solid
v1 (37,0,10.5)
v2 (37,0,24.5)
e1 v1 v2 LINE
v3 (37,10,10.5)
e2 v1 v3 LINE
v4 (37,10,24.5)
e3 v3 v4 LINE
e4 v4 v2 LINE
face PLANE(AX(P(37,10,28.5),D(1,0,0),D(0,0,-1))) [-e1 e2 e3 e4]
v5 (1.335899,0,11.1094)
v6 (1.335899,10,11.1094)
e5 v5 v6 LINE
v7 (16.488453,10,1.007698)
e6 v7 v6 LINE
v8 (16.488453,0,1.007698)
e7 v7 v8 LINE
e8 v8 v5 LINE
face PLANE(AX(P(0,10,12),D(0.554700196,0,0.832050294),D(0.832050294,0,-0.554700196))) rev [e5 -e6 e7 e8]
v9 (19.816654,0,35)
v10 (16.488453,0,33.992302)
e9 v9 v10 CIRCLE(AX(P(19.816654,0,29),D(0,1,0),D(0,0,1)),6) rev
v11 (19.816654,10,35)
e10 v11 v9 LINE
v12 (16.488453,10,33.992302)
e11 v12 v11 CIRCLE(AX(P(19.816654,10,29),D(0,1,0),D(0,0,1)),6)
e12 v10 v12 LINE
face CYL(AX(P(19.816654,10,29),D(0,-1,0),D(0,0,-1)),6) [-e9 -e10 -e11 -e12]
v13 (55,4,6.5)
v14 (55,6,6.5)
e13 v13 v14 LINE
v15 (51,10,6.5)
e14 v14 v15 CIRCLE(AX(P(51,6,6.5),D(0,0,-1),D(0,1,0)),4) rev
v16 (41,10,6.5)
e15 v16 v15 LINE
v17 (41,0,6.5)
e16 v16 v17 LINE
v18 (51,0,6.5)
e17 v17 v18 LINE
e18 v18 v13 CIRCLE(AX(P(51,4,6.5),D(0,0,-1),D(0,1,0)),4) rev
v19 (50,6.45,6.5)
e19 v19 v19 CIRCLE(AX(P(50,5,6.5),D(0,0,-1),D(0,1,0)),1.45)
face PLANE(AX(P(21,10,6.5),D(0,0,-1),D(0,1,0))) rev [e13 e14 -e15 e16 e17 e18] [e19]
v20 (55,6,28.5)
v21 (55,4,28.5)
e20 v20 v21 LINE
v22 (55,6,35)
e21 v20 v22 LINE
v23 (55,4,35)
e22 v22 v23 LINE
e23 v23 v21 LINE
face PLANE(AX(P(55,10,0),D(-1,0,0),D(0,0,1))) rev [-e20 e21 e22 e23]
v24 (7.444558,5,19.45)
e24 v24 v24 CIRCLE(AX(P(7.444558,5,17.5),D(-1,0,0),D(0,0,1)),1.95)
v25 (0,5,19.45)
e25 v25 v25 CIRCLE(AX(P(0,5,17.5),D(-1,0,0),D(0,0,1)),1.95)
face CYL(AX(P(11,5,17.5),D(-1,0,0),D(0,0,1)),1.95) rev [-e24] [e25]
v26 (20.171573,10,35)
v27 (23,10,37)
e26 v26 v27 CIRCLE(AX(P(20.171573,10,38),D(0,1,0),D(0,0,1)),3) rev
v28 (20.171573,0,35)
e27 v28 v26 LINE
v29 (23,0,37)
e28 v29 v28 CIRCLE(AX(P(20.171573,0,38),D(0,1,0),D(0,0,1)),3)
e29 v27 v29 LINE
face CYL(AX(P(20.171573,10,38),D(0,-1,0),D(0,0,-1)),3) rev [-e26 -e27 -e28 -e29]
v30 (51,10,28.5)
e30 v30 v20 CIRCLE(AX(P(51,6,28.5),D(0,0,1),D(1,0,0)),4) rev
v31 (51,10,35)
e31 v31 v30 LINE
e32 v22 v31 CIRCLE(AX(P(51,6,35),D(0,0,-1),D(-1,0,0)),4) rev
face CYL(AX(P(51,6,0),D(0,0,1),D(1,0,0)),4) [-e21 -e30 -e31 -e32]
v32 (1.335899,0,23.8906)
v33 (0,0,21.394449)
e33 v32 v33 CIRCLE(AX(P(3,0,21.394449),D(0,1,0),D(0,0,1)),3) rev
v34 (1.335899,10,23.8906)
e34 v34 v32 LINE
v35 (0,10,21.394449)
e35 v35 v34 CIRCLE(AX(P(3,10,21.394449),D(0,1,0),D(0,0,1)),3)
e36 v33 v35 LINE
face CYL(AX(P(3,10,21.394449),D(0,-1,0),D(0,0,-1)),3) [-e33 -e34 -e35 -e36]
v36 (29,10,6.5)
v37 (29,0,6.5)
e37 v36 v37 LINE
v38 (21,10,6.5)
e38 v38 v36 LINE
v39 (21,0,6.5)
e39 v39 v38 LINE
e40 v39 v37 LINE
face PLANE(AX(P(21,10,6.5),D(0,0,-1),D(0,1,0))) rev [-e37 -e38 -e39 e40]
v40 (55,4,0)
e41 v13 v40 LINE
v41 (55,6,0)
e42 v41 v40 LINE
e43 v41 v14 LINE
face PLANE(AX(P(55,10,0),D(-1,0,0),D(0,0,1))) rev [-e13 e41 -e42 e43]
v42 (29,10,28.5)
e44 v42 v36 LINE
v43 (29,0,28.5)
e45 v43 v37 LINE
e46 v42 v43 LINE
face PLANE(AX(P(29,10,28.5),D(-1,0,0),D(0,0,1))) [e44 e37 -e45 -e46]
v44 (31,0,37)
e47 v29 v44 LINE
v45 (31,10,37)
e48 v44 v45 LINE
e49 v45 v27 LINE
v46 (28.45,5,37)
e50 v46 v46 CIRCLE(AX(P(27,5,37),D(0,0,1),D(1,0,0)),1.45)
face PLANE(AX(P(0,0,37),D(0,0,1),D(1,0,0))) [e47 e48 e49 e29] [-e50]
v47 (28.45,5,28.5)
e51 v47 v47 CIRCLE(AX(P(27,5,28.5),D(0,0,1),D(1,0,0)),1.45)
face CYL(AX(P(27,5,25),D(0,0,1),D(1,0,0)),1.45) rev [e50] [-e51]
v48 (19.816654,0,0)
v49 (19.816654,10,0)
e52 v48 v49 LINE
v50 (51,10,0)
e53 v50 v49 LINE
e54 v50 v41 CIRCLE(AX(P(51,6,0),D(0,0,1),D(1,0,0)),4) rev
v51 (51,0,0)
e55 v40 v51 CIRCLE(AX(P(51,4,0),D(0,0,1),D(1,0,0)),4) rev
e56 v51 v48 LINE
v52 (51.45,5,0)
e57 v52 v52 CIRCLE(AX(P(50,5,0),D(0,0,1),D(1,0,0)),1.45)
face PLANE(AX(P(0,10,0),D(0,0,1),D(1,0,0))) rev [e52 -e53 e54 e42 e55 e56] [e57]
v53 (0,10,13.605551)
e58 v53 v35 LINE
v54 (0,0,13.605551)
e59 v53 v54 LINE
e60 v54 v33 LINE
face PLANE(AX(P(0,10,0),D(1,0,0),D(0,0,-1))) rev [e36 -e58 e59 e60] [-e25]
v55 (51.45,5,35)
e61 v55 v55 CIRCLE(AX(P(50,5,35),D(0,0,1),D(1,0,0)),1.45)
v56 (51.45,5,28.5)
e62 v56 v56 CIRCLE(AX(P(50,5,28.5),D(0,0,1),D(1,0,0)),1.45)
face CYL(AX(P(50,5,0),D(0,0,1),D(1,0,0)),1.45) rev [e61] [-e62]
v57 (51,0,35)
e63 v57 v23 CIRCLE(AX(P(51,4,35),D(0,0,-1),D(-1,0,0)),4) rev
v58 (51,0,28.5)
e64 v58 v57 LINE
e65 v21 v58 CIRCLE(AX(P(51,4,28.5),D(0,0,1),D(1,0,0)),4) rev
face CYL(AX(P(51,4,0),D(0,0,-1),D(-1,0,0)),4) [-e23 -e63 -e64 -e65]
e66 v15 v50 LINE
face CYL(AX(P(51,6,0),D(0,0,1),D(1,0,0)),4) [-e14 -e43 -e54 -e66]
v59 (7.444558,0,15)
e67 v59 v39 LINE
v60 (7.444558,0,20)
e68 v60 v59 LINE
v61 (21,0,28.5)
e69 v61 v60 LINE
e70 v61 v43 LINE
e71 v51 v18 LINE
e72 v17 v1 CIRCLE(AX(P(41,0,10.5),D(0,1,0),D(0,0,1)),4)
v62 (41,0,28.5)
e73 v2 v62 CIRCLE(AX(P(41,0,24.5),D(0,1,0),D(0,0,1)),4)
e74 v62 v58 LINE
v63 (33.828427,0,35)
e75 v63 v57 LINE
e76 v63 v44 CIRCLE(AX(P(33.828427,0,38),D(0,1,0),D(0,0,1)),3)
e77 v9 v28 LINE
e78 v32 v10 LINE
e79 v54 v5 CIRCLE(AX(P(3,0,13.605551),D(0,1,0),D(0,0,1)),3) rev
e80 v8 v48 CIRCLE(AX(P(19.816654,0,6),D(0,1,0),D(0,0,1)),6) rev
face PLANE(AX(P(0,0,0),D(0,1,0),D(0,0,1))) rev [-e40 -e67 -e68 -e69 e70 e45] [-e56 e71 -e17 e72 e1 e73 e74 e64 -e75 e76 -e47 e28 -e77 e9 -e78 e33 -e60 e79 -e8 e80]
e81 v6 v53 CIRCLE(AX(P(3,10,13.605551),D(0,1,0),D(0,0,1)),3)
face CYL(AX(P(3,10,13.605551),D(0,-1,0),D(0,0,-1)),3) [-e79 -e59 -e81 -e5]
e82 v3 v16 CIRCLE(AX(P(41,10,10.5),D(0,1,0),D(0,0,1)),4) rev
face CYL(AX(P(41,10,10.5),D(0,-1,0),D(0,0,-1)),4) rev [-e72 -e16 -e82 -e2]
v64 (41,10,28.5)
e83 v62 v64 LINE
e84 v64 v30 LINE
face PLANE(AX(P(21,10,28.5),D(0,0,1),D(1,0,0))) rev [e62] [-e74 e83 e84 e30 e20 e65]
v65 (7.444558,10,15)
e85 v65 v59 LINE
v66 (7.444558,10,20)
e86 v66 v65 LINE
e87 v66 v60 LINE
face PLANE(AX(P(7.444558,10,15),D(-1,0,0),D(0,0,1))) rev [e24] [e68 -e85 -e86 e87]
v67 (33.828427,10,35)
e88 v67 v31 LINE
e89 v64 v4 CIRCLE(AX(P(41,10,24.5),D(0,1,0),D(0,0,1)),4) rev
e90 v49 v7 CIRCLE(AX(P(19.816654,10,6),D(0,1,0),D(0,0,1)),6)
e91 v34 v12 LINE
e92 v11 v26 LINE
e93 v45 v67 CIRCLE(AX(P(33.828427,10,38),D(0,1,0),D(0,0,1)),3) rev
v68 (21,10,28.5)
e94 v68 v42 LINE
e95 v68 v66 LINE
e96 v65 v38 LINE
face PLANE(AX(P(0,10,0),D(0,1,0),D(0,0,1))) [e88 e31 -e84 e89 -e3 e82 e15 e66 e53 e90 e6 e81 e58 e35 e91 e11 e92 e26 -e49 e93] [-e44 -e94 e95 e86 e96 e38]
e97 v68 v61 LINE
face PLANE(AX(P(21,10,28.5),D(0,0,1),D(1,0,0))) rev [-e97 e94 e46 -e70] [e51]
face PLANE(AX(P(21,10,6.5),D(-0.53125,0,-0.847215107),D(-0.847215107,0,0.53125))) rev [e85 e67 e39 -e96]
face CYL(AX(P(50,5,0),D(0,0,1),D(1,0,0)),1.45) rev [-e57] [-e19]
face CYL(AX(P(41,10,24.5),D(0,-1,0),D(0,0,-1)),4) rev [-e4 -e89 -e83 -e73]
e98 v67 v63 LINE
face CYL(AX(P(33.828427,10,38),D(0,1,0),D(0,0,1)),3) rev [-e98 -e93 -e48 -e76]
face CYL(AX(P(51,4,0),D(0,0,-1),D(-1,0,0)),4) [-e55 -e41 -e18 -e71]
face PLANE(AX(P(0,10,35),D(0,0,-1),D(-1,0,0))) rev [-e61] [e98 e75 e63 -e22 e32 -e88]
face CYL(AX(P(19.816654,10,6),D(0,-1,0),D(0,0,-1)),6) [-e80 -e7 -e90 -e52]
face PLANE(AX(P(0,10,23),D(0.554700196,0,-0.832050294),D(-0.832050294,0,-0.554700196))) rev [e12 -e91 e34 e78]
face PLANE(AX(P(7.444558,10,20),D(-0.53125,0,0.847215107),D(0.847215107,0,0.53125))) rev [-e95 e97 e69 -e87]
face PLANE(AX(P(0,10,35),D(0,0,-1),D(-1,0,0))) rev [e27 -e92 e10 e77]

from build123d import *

# Parameters (mm, degrees)
SKETCH1_W           = 55
SKETCH1_H           = 35
BOSS_EXTRUDE1_DEPTH = 10
SKETCH2_W           = 22
SKETCH2_H           = 10
CUT_EXTRUDE1_DEPTH  = 34
CUT_EXTRUDE6_DEPTH  = 66.954529791
CUT_EXTRUDE7_DEPTH  = 66.954529791
SKETCH11_W          = 8
SKETCH11_H          = 22
BOSS_EXTRUDE3_DEPTH = 10
SKETCH12_R          = 1.45
CUT_EXTRUDE8_DEPTH  = 66.954529791
SKETCH13_R          = 1.95
CUT_EXTRUDE9_DEPTH  = 11
FILLET4_R           = 4
FILLET5_R           = 3
FILLET6_R           = 6
FILLET7_R           = 4
SKETCH14_W          = 8
SKETCH14_H          = 10
BOSS_EXTRUDE4_DEPTH = 2
SKETCH15_R          = 1.45
CUT_EXTRUDE10_DEPTH = 12
FILLET8_R           = 3


with BuildPart() as part:
    # Sketch1 → Boss-Extrude1 (new body)
    with BuildSketch(Plane(origin=(0, 0, 0), x_dir=(1, 0, 0), z_dir=(0, 1, 0))):
        with Locations((27.5, -17.5)):
            Rectangle(SKETCH1_W, SKETCH1_H)
    extrude(amount=BOSS_EXTRUDE1_DEPTH)

    # Sketch2 → Cut-Extrude1 (cut)
    with BuildSketch(Plane(origin=(55, 0, 0), x_dir=(0, 0, -1), z_dir=(1, 0, 0))):
        with Locations((-17.5, 5)):
            Rectangle(SKETCH2_W, SKETCH2_H)
    extrude(amount=-CUT_EXTRUDE1_DEPTH, mode=Mode.SUBTRACT)

    # Sketch9 → Cut-Extrude6 (cut, through all)
    with BuildSketch(Plane(origin=(0, 0, 0), x_dir=(-1, 0, 0), z_dir=(0, -1, 0))):
        Polygon((0, -12), (-18, 0), (0, 0), align=None)
        Polygon((0, -23), (-18, -35), (0, -35), align=None)
    extrude(amount=-CUT_EXTRUDE6_DEPTH, mode=Mode.SUBTRACT)

    # Sketch10 → Cut-Extrude7 (cut, through all)
    with BuildSketch(Plane(origin=(0, 0, 0), x_dir=(-1, 0, 0), z_dir=(0, -1, 0))):
        Polygon((-21, -6.5), (-7.444558288, -15), (-7.444558288, -20), (-21, -28.5), align=None)
    extrude(amount=-CUT_EXTRUDE7_DEPTH, mode=Mode.SUBTRACT)

    # Sketch11 → Boss-Extrude3 (add)
    with BuildSketch(Plane(origin=(0, 0, 0), x_dir=(-1, 0, 0), z_dir=(0, -1, 0))):
        with Locations((-33, -17.5)):
            Rectangle(SKETCH11_W, SKETCH11_H)
    extrude(amount=-BOSS_EXTRUDE3_DEPTH)

    # Sketch12 → Cut-Extrude8 (cut, through all)
    with BuildSketch(Plane.XY.offset(35)):
        with Locations((50, 5)):
            Circle(SKETCH12_R)
    extrude(amount=-CUT_EXTRUDE8_DEPTH, mode=Mode.SUBTRACT)

    # Sketch13 → Cut-Extrude9 (cut)
    with BuildSketch(Plane.ZY):
        with Locations((17.5, 5)):
            Circle(SKETCH13_R)
    extrude(amount=-CUT_EXTRUDE9_DEPTH, mode=Mode.SUBTRACT)

    # Fillet4
    fillet4_edges = [part.edges().sort_by_distance(p)[0] for p in [
        (55, 10, 31.75),
        (55, 0, 3.25),
        (55, 10, 3.25),
        (55, 0, 31.75),
    ]]
    fillet(fillet4_edges, radius=FILLET4_R)

    # Fillet5
    fillet5_edges = [part.edges().sort_by_distance(p)[0] for p in [
        (0, 5, 12),
        (0, 5, 23),
    ]]
    fillet(fillet5_edges, radius=FILLET5_R)

    # Fillet6
    fillet6_edges = [part.edges().sort_by_distance(p)[0] for p in [
        (18, 5, 0),
        (18, 5, 35),
    ]]
    fillet(fillet6_edges, radius=FILLET6_R)

    # Fillet7
    fillet7_edges = [part.edges().sort_by_distance(p)[0] for p in [
        (37, 5, 28.5),
        (37, 5, 6.5),
    ]]
    fillet(fillet7_edges, radius=FILLET7_R)

    # Sketch14 → Boss-Extrude4 (add)
    with BuildSketch(Plane.XY.offset(35)):
        with Locations((27, 5)):
            Rectangle(SKETCH14_W, SKETCH14_H)
    extrude(amount=BOSS_EXTRUDE4_DEPTH)

    # Sketch15 → Cut-Extrude10 (cut)
    with BuildSketch(Plane.XY.offset(37)):
        with Locations((27, 5)):
            Circle(SKETCH15_R)
    extrude(amount=-CUT_EXTRUDE10_DEPTH, mode=Mode.SUBTRACT)

    # Fillet8
    # the kernel refuses this fillet: 3 mm, written as the material it adds along each edge
    with BuildSketch(Plane(origin=(23, 0, 35), x_dir=(0, 0, 1), z_dir=(0, 1, 0))) as fillet8_piece_1:
        with BuildLine():
            CenterArc((3, -2.828427125), FILLET8_R, 109.471220634, 70.528779366)
            Line((0, -2.828427125), (-0.06, -2.828427125))
            Line((-0.06, -2.828427125), (-0.06, 0))
            Line((-0.06, 0), (0, 0.06))
            ThreePointArc((0, 0.06), (1, 0.06), (1.98, 0.056568542))
            Line((1.98, 0.056568542), (2, 0))
        make_face()
    extrude(amount=10)
    with BuildSketch(Plane(origin=(31, 10, 35), x_dir=(1, 0, 0), z_dir=(0, -1, 0))) as fillet8_piece_2:
        with BuildLine():
            CenterArc((2.828427125, 3), FILLET8_R, 199.471220634, 70.528779366)
            Line((0, 2), (-0.056568542, 1.98))
            ThreePointArc((-0.056568542, 1.98), (-0.06, 1), (-0.06, 0))
            Line((-0.06, 0), (0, -0.06))
            Line((0, -0.06), (2.828427125, -0.06))
            Line((2.828427125, -0.06), (2.828427125, 0))
        make_face()
    extrude(amount=10)


solid = part.part
